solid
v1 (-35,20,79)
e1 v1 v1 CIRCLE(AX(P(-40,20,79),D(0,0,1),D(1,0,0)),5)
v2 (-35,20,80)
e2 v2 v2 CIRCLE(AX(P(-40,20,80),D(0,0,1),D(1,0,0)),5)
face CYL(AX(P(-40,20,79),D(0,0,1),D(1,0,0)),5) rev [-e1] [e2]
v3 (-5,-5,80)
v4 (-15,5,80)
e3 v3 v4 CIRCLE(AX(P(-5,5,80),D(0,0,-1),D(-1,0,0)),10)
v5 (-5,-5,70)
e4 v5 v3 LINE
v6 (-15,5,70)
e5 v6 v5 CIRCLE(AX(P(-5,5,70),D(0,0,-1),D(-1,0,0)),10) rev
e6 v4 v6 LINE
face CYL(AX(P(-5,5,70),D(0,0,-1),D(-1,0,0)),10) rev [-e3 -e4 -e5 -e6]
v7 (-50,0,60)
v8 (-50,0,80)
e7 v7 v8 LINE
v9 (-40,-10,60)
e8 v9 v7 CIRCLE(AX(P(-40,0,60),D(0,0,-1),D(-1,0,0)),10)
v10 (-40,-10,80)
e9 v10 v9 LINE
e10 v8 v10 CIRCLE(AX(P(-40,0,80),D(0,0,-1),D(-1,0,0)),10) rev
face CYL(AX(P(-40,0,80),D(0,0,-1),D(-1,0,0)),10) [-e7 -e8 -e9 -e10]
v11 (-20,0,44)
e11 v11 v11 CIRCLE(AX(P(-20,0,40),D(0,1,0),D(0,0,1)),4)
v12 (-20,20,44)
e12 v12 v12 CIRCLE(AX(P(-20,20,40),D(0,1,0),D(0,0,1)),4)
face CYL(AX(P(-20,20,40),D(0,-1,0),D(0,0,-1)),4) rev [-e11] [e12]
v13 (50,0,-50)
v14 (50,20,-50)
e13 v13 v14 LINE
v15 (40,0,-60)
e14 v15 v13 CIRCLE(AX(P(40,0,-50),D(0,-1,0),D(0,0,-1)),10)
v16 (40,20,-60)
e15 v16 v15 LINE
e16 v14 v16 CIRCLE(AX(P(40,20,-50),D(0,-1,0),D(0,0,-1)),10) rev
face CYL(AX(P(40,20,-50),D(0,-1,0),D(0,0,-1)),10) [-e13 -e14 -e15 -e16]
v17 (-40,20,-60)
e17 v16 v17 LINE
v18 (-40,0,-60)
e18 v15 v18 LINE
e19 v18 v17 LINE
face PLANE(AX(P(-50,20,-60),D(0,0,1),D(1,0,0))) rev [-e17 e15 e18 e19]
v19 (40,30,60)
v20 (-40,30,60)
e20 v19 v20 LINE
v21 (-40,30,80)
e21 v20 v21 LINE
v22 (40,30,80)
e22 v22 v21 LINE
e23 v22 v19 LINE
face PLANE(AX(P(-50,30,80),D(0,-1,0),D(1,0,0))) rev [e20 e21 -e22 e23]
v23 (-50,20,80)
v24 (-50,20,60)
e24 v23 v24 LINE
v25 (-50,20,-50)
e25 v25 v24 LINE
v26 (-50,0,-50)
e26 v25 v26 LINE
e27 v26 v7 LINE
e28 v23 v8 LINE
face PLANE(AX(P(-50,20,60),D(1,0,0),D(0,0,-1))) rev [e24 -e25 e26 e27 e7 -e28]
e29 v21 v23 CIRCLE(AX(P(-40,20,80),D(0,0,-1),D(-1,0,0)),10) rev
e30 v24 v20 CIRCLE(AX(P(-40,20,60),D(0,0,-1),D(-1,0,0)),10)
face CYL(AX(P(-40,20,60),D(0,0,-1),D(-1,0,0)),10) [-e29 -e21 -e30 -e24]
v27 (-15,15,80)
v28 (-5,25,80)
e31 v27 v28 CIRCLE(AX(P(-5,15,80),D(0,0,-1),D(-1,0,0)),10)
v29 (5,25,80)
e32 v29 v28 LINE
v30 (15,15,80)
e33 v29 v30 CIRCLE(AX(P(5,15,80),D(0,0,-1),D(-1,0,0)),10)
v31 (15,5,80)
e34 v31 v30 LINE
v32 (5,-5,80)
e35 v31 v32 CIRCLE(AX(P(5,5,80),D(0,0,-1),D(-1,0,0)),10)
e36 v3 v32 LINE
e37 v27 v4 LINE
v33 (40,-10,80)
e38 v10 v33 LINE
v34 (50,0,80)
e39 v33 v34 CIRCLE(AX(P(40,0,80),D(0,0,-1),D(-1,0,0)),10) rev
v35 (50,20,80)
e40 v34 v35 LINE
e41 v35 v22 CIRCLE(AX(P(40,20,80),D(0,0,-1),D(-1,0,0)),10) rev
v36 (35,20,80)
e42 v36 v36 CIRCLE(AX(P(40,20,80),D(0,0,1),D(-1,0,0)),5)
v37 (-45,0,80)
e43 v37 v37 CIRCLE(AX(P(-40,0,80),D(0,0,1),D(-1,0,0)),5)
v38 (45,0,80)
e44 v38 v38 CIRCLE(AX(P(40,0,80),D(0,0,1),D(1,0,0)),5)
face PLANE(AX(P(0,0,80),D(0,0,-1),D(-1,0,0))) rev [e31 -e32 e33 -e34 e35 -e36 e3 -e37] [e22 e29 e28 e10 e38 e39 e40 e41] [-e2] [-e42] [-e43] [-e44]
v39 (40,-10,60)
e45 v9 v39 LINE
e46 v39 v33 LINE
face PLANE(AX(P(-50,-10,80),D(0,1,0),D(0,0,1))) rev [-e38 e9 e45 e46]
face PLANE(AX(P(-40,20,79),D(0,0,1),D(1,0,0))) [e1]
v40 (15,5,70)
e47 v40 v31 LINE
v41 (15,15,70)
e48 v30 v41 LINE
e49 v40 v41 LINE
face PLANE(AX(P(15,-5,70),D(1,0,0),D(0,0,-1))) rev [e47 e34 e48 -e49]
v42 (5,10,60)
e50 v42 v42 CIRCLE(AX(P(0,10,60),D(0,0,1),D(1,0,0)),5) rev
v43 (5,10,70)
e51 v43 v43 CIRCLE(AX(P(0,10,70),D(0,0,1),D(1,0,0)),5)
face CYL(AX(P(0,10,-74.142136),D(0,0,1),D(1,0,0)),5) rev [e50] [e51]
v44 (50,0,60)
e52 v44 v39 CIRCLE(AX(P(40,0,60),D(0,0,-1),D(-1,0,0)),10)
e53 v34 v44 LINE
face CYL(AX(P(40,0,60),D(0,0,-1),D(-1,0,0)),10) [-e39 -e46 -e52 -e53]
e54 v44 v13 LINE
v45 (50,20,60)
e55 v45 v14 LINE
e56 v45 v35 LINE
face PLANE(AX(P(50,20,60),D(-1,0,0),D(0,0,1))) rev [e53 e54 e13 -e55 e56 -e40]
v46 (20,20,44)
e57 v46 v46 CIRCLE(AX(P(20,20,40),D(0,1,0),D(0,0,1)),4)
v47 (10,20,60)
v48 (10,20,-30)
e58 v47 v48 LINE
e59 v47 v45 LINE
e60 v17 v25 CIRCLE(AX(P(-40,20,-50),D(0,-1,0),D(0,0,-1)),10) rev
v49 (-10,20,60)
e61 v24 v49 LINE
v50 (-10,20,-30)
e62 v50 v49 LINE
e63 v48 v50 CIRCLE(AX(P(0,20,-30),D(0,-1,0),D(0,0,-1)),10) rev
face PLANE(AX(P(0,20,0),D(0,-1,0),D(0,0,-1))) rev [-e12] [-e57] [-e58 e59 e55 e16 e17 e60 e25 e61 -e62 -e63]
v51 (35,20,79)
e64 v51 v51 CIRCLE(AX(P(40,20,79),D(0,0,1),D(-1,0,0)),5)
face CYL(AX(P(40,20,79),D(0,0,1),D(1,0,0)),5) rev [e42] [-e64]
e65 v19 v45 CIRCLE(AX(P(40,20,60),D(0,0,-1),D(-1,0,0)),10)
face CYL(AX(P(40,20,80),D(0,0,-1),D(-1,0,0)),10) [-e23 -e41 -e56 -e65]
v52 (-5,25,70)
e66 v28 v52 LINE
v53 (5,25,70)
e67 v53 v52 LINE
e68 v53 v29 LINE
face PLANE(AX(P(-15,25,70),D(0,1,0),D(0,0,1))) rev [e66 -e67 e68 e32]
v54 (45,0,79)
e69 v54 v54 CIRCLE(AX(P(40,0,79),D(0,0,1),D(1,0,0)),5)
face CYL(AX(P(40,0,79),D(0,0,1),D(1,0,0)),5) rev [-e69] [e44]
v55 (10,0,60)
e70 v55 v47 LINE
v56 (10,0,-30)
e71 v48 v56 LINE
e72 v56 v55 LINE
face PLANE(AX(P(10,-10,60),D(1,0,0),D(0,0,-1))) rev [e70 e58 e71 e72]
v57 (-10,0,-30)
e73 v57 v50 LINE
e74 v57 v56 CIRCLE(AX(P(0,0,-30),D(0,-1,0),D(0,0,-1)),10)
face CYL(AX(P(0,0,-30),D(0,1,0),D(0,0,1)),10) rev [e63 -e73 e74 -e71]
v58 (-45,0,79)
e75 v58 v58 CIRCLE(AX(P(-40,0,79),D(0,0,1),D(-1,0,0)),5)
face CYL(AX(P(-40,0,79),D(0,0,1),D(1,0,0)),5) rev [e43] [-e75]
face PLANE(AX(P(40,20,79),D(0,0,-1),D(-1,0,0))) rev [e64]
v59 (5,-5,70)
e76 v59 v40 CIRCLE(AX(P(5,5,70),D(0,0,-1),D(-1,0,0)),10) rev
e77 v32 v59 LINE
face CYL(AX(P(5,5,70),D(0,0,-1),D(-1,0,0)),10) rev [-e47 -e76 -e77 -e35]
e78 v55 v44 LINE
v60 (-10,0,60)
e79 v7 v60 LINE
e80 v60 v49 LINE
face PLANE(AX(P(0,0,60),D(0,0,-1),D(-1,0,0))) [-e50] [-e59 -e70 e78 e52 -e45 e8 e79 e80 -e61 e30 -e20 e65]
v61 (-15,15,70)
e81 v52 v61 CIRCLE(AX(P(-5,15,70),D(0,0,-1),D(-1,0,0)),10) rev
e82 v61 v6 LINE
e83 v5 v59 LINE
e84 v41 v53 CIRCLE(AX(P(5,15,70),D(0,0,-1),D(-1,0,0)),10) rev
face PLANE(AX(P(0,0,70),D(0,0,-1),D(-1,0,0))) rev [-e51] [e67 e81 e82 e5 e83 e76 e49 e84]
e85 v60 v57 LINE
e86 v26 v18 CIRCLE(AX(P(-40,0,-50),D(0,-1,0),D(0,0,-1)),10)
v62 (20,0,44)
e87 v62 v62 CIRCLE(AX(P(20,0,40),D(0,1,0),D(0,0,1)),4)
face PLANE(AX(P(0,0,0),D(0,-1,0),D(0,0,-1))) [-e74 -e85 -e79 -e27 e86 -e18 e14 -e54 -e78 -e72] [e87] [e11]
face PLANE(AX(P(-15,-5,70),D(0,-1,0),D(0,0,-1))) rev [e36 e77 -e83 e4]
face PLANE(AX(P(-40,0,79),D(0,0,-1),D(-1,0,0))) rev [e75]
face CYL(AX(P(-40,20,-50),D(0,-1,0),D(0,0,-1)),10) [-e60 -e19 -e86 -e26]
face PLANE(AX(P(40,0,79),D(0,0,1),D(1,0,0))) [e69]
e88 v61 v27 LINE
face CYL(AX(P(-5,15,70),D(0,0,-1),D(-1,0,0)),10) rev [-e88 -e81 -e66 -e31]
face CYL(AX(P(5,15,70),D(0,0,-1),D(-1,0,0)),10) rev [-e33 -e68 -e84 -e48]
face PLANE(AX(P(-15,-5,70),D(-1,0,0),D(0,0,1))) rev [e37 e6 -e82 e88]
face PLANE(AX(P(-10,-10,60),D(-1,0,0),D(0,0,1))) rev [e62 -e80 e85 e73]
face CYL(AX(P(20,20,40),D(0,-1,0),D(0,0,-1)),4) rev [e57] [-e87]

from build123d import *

# Parameters (mm, degrees)
SKETCH_1_W          = 100
SKETCH_1_H          = 120
SKETCH_1_R          = 4
EXTRUDE_1_DEPTH     = 20
SKETCH_4_W          = 100
SKETCH_4_H          = 40
EXTRUDE_2_DEPTH     = 20
SKETCH_5_W          = 30
SKETCH_5_H          = 30
CUT_EXTRUDE_1_DEPTH = 10
SKETCH_7_R          = 5
CUT_EXTRUDE_3_DEPTH = 110
SKETCH_8_R          = 5
CUT_EXTRUDE_4_DEPTH = 1
SKETCH_9_W          = 20
SKETCH_9_H          = 100
CUT_EXTRUDE_6_DEPTH = 99.994949366
FILLET_5_R          = 10
FILLET_2_R          = 10
FILLET_1_R          = 10
FILLET_9_R          = 10


with BuildPart() as part:
    # ｽｹｯﾁ1 → ﾎﾞｽ - 押し出し1 (new body)
    with BuildSketch(Plane(origin=(0, 0, 0), x_dir=(1, 0, 0), z_dir=(0, 1, 0))):
        Rectangle(SKETCH_1_W, SKETCH_1_H)
        with Locations(Location((-20, -40, 0), (0, 0, 270))):
            Circle(SKETCH_1_R, mode=Mode.SUBTRACT)
        with Locations(Location((20, -40, 0), (0, 0, 270))):
            Circle(SKETCH_1_R, mode=Mode.SUBTRACT)
    extrude(amount=EXTRUDE_1_DEPTH)

    # ｽｹｯﾁ4 → ﾎﾞｽ - 押し出し2 (add)
    with BuildSketch(Plane.XY.offset(60)):
        with Locations((0, 10)):
            Rectangle(SKETCH_4_W, SKETCH_4_H)
    extrude(amount=EXTRUDE_2_DEPTH)

    # ｽｹｯﾁ5 → ｶｯﾄ - 押し出し1 (cut)
    with BuildSketch(Plane.XY.offset(80)):
        with Locations((0, 10)):
            Rectangle(SKETCH_5_W, SKETCH_5_H)
    extrude(amount=-CUT_EXTRUDE_1_DEPTH, mode=Mode.SUBTRACT)

    # ｽｹｯﾁ7 → ｶｯﾄ - 押し出し3 (cut)
    with BuildSketch(Plane.XY.offset(70)):
        with Locations((0, 10)):
            Circle(SKETCH_7_R)
    extrude(amount=-CUT_EXTRUDE_3_DEPTH, mode=Mode.SUBTRACT)

    # ｽｹｯﾁ8 → ｶｯﾄ - 押し出し4 (cut)
    with BuildSketch(Plane.XY.offset(80)):
        with Locations((-40, 20)):
            Circle(SKETCH_8_R)
        with Locations(Location((40, 20, 0), (0, 0, 180))):
            Circle(SKETCH_8_R)
        with Locations((40, 0)):
            Circle(SKETCH_8_R)
        with Locations(Location((-40, 0, 0), (0, 0, 180))):
            Circle(SKETCH_8_R)
    extrude(amount=-CUT_EXTRUDE_4_DEPTH, mode=Mode.SUBTRACT)

    # ｽｹｯﾁ9 → ｶｯﾄ - 押し出し6 (cut, through all)
    with BuildSketch(Plane(origin=(0, 20, 0), x_dir=(1, 0, 0), z_dir=(0, 1, 0))):
        with Locations((0, -10)):
            Rectangle(SKETCH_9_W, SKETCH_9_H)
    extrude(amount=-CUT_EXTRUDE_6_DEPTH, mode=Mode.SUBTRACT)

    # ﾌｨﾚｯﾄ5
    fillet_5_edges = [part.edges().sort_by_distance(p)[0] for p in [
        (15, 25, 75),
        (15, -5, 75),
        (-15, -5, 75),
        (-15, 25, 75),
    ]]
    fillet(fillet_5_edges, radius=FILLET_5_R)

    # ﾌｨﾚｯﾄ2
    fillet_2_edges = [part.edges().sort_by_distance(p)[0] for p in [
        (-50, 10, -60),
        (50, 10, -60),
    ]]
    fillet(fillet_2_edges, radius=FILLET_2_R)

    # ﾌｨﾚｯﾄ1
    fillet_1_edges = [part.edges().sort_by_distance(p)[0] for p in [
        (50, 30, 70),
        (50, -10, 70),
        (-50, -10, 70),
        (-50, 30, 70),
    ]]
    fillet(fillet_1_edges, radius=FILLET_1_R)

    # ﾌｨﾚｯﾄ9
    fillet_9_edges = [part.edges().sort_by_distance(p)[0] for p in [
        (-10, 10, -40),
        (10, 10, -40),
    ]]
    fillet(fillet_9_edges, radius=FILLET_9_R - 0.0001)  # a hair under: the kernel refuses the full size


solid = part.part
